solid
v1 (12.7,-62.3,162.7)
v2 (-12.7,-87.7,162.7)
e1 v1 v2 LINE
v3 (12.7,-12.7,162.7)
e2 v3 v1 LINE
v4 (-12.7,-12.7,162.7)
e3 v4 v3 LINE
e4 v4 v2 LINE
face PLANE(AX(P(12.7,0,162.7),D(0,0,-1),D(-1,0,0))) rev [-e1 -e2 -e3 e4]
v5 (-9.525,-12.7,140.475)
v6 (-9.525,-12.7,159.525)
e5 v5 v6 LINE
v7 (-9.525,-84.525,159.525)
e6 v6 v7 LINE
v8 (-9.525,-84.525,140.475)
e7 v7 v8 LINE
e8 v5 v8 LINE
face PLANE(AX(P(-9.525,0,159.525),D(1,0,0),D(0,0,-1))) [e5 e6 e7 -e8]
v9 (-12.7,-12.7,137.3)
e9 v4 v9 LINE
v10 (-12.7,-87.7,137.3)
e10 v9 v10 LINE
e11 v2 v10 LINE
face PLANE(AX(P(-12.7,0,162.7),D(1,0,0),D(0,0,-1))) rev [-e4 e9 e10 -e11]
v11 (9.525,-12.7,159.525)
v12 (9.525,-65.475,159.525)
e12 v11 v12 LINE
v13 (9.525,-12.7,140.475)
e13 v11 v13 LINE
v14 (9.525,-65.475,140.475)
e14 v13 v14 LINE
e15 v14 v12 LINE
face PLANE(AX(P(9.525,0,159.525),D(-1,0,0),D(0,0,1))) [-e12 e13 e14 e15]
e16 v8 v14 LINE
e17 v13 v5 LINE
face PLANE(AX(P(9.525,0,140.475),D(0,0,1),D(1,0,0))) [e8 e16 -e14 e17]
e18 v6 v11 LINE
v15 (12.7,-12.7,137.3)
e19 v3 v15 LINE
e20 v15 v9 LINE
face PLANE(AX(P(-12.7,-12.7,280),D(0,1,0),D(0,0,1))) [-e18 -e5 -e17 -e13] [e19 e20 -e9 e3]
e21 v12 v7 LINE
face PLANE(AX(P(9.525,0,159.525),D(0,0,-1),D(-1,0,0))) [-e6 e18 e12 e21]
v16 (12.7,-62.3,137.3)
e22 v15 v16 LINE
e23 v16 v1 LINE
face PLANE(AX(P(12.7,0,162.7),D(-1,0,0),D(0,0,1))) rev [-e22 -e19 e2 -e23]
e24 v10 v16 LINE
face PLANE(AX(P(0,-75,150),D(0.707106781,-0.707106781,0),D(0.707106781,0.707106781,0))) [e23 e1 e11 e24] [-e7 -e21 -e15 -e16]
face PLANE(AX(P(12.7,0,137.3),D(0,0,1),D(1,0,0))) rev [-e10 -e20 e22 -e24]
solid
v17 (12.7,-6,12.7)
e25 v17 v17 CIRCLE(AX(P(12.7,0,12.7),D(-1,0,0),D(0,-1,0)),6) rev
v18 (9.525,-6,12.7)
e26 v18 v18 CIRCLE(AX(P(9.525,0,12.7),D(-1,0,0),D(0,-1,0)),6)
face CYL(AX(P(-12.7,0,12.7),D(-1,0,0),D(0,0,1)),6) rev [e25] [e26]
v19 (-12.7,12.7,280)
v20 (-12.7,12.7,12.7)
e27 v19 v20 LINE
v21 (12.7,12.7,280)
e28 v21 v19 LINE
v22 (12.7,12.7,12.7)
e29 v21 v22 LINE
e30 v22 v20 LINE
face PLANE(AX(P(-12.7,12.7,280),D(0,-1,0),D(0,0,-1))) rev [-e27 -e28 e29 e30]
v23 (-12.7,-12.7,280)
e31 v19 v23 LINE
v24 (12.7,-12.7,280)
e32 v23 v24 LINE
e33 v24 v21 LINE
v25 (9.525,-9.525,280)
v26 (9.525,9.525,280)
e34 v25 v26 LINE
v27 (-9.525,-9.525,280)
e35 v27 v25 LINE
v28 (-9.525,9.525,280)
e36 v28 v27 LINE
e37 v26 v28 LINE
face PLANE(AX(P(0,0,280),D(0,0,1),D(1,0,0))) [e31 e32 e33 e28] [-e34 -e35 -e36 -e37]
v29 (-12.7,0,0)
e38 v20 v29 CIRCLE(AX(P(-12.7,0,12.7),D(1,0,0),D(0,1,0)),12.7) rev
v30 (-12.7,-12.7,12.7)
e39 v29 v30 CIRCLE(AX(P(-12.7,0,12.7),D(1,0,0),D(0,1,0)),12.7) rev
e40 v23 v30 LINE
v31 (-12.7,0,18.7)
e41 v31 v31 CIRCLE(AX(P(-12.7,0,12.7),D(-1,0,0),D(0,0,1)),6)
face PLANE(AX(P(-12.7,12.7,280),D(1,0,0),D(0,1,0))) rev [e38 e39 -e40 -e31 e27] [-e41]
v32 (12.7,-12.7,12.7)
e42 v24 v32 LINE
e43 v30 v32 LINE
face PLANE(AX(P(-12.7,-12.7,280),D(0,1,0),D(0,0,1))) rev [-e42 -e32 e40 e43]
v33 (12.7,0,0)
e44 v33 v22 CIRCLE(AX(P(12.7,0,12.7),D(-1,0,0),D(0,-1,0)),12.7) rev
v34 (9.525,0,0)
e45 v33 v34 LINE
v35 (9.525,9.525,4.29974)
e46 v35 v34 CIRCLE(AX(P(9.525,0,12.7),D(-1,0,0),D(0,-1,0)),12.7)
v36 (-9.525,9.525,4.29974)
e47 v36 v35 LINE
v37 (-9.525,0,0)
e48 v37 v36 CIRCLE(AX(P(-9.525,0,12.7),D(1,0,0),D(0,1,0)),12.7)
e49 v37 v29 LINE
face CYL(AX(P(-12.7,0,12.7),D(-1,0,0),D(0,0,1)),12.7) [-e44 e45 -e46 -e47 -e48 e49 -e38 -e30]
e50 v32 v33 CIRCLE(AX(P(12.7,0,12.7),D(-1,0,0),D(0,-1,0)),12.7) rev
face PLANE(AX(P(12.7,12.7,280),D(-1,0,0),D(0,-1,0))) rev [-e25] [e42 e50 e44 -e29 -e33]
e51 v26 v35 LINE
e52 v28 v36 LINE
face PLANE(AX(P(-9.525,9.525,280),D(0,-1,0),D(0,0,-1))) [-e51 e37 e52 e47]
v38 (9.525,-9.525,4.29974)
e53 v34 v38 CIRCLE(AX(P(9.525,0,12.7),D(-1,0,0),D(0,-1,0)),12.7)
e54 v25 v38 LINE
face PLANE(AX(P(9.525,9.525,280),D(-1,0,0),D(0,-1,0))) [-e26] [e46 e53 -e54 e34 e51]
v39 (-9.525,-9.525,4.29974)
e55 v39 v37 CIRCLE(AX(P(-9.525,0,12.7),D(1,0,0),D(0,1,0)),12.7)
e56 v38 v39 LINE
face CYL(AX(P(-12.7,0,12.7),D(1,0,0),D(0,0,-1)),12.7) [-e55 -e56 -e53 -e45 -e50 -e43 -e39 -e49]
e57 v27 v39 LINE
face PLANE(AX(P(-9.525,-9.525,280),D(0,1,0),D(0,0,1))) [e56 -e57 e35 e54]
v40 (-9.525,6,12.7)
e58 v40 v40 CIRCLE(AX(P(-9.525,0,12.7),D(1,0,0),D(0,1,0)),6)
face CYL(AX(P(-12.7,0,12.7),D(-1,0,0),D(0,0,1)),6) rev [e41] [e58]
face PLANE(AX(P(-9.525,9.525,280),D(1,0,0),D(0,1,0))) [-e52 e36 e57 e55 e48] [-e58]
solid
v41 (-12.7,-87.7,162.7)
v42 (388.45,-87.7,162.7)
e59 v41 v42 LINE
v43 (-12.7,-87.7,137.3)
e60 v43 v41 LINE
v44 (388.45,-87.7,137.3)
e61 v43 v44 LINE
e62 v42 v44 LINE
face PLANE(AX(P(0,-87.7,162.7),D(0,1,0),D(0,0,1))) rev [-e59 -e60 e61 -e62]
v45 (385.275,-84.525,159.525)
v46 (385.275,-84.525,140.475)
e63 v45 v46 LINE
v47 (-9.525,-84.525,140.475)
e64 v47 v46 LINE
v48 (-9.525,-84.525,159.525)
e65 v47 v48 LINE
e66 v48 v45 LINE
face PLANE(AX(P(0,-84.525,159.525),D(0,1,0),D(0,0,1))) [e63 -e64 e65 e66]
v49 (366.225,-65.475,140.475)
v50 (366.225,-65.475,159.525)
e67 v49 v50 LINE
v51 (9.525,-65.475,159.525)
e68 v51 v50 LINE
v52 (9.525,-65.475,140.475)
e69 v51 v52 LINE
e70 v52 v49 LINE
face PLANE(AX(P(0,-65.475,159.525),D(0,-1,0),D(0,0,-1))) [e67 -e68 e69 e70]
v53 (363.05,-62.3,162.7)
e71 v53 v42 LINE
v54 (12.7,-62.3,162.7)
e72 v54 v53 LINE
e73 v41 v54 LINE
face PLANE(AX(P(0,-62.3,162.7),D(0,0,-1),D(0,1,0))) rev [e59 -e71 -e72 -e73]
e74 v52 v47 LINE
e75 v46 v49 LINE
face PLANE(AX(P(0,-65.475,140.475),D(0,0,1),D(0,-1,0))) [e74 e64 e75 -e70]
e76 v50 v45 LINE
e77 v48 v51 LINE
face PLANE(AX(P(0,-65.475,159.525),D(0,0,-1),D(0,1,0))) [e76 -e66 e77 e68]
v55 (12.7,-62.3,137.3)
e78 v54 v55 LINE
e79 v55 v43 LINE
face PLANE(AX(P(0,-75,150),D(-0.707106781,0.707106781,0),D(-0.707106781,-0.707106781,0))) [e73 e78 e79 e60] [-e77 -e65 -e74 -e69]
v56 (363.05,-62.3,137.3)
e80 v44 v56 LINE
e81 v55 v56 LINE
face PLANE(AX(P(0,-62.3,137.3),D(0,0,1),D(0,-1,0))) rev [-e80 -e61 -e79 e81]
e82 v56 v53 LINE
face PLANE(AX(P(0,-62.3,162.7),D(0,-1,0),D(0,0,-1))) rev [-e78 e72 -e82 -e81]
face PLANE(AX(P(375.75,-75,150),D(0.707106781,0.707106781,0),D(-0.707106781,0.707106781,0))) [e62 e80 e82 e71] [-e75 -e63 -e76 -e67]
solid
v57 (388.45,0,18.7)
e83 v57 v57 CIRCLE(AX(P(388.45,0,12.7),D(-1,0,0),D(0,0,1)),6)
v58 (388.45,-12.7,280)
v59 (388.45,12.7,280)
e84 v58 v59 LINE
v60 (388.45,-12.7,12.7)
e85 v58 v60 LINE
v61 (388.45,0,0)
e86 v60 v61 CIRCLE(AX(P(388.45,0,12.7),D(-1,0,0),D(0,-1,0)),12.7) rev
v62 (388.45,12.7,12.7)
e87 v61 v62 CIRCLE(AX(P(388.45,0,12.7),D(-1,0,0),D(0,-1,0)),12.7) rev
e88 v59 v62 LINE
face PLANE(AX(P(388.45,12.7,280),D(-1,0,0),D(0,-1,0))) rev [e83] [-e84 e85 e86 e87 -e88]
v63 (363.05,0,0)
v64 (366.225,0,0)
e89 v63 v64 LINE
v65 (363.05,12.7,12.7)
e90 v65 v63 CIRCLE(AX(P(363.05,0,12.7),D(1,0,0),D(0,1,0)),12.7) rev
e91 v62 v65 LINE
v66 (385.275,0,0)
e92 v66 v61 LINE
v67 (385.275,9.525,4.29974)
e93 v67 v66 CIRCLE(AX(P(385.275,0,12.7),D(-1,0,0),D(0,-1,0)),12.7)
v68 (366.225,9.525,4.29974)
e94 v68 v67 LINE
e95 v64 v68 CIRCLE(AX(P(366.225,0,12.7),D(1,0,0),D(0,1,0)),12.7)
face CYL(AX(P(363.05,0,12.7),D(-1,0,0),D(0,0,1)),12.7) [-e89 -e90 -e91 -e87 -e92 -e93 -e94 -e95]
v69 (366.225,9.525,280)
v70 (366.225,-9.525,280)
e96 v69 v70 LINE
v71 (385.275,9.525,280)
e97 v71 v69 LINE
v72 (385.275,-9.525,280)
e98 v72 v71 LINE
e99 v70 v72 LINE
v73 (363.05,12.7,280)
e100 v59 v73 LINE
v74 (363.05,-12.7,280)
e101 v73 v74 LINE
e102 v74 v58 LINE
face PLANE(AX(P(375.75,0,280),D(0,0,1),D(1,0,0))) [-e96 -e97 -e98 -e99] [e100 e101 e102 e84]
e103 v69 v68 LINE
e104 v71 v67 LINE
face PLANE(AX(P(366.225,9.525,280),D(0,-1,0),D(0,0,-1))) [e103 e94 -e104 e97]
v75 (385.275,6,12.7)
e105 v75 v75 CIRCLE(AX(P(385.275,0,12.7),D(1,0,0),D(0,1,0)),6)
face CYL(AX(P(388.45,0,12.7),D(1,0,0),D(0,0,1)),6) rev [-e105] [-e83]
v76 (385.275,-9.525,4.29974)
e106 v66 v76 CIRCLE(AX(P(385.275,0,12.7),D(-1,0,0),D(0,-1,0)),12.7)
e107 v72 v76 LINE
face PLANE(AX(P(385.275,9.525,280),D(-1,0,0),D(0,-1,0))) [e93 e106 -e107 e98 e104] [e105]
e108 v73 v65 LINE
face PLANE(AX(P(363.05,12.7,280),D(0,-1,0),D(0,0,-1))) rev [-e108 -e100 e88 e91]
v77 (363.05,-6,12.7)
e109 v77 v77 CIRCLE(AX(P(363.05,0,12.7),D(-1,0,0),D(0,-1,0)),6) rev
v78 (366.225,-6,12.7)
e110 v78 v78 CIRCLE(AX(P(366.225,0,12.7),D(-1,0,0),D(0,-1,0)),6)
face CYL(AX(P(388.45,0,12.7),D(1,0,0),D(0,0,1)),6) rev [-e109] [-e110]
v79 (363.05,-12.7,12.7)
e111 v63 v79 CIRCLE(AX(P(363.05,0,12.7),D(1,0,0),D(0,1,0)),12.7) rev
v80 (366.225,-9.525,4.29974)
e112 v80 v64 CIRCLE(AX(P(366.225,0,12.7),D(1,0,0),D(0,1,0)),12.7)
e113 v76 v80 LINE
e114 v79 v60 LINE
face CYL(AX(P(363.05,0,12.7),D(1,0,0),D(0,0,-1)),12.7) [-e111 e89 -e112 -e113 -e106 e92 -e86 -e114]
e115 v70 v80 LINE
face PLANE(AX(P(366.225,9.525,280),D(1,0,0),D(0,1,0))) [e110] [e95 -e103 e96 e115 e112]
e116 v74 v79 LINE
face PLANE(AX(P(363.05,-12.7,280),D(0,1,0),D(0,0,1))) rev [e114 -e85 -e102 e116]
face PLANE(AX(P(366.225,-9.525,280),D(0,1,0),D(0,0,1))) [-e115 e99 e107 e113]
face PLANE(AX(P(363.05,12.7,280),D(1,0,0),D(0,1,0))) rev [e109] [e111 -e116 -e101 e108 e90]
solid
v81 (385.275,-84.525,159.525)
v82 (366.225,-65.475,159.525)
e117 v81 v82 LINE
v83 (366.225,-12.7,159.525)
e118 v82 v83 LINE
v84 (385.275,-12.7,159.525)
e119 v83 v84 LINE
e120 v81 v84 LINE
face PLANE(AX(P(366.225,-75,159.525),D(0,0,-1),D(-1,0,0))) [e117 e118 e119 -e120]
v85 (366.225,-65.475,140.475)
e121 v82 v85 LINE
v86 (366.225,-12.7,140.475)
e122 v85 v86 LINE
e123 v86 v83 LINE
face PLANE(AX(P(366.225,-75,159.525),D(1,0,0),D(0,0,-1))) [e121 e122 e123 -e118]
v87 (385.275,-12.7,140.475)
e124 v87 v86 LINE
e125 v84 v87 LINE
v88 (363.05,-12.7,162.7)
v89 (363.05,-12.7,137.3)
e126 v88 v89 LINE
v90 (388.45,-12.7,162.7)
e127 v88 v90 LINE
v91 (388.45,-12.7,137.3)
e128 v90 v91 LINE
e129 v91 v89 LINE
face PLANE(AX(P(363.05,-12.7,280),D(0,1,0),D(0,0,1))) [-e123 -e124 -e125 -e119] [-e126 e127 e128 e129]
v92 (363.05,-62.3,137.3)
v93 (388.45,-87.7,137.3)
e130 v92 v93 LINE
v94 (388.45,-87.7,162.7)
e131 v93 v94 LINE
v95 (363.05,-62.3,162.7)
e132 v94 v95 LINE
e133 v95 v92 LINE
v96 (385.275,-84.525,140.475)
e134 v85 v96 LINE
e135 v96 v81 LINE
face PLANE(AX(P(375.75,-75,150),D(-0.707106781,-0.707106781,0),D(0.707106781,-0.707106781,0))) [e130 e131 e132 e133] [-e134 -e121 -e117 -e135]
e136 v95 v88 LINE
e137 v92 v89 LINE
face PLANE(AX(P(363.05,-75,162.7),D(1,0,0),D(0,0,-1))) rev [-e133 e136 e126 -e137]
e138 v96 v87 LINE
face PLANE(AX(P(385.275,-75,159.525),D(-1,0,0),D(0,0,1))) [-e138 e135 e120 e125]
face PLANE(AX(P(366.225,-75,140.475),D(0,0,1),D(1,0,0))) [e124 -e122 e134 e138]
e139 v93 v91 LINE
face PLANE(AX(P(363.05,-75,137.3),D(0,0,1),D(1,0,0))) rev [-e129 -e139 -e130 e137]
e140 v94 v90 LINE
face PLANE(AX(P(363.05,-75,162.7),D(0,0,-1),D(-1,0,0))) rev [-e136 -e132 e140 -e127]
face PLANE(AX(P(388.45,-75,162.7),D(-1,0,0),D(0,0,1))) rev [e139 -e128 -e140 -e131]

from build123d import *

# Parameters (mm, degrees)
SKETCH1_W                   = 25.4
SKETCH1_H                   = 25.4
SKETCH1_W_2                 = 19.05
SKETCH1_H_2                 = 19.05
KICKSTAND_WELDMENTS_DEPTH   = 280
SKETCH1_ON_SEGMENT_2_W      = 25.4
SKETCH1_ON_SEGMENT_2_H      = 25.4
SKETCH1_ON_SEGMENT_2_W_2    = 19.05
SKETCH1_ON_SEGMENT_2_H_2    = 19.05
KICKSTAND_WELDMENTS_2_DEPTH = 280
SKETCH1_ON_SEGMENT_3_W      = 25.4
SKETCH1_ON_SEGMENT_3_H      = 25.4
SKETCH1_ON_SEGMENT_3_W_2    = 19.05
SKETCH1_ON_SEGMENT_3_H_2    = 19.05
KICKSTAND_WELDMENTS_3_DEPTH = 94.960512242
SKETCH1_ON_SEGMENT_4_W      = 25.4
SKETCH1_ON_SEGMENT_4_H      = 25.4
SKETCH1_ON_SEGMENT_4_W_2    = 19.05
SKETCH1_ON_SEGMENT_4_H_2    = 19.05
KICKSTAND_WELDMENTS_4_DEPTH = 413.671024484
SKETCH1_ON_SEGMENT_5_W      = 25.4
SKETCH1_ON_SEGMENT_5_H      = 25.4
SKETCH1_ON_SEGMENT_5_W_2    = 19.05
SKETCH1_ON_SEGMENT_5_H_2    = 19.05
KICKSTAND_WELDMENTS_5_DEPTH = 94.960512242
FILLET1_R                   = 12.7
FILLET2_R                   = 12.7


with BuildPart() as part:
    # Sketch1 → Kickstand Weldments (new body)
    with BuildSketch(Plane.XY):
        Rectangle(SKETCH1_W, SKETCH1_H)
        Rectangle(SKETCH1_W_2, SKETCH1_H_2, mode=Mode.SUBTRACT)
    extrude(amount=KICKSTAND_WELDMENTS_DEPTH)

    # Sketch4 → Ø12.0 (12) Diameter Hole1 (revolve, cut)
    with BuildSketch(Plane(origin=(-12.7, 0, 12.7), x_dir=(0, 0, 1), z_dir=(0, 1, 0))):
        Polygon((0, 0), (0, 29.005163714), (6, 25.4), (6, 0), align=None)
    f_12_0_12_diameter_hole1 = revolve(axis=Axis((-19.05, 0, 12.7), (1, 0, 0)), mode=Mode.SUBTRACT)

    # Fillet1
    # the kernel refuses this fillet: 12.7 mm, written as the material it takes off along each edge
    with BuildSketch(Plane(origin=(-44.45, 12.7, 0), x_dir=(0, 0, 1), z_dir=(1, 0, 0))) as fillet1_piece_1:
        with BuildLine():
            CenterArc((FILLET1_R, FILLET1_R), FILLET1_R, 180, 90)
            Line((0, FILLET1_R), (0, 0))
            Line((0, 0), (FILLET1_R, 0))
        make_face()
    extrude(amount=88.9, mode=Mode.SUBTRACT)
    with BuildSketch(Plane(origin=(44.45, -12.7, 0), x_dir=(0, 1, 0), z_dir=(-1, 0, 0))) as fillet1_piece_2:
        with BuildLine():
            CenterArc((FILLET1_R, -FILLET1_R), FILLET1_R, 90, 90)
            Line((0, -FILLET1_R), (0, 0))
            Line((0, 0), (FILLET1_R, 0))
        make_face()
    extrude(amount=88.9, mode=Mode.SUBTRACT)


with BuildPart() as body_2:
    # Sketch1 on segment 2 (carried to segment 2) → Kickstand Weldments 2 (new body)
    with BuildSketch(Plane(origin=(375.75, 0, 0), x_dir=(1, 0, 0), z_dir=(0, 0, 1))):
        Rectangle(SKETCH1_ON_SEGMENT_2_W, SKETCH1_ON_SEGMENT_2_H)
        Rectangle(SKETCH1_ON_SEGMENT_2_W_2, SKETCH1_ON_SEGMENT_2_H_2, mode=Mode.SUBTRACT)
    extrude(amount=KICKSTAND_WELDMENTS_2_DEPTH)

    # Mirror2: Ø12.0 (12) Diameter Hole1 across plane
    add(f_12_0_12_diameter_hole1.mirror(Plane(origin=(187.875, 0, 0), x_dir=(0, 0, 1), z_dir=(1, 0, 0))), mode=Mode.SUBTRACT)

    # Fillet2
    # the kernel refuses this fillet: 12.7 mm, written as the material it takes off along each edge
    with BuildSketch(Plane(origin=(420.2, -12.7, 0), x_dir=(0, 1, 0), z_dir=(-1, 0, 0))) as fillet2_piece_1:
        with BuildLine():
            CenterArc((FILLET2_R, -FILLET2_R), FILLET2_R, 90, 90)
            Line((0, -FILLET2_R), (0, 0))
            Line((0, 0), (FILLET2_R, 0))
        make_face()
    extrude(amount=88.9, mode=Mode.SUBTRACT)
    with BuildSketch(Plane(origin=(331.3, 12.7, 0), x_dir=(0, 0, 1), z_dir=(1, 0, 0))) as fillet2_piece_2:
        with BuildLine():
            CenterArc((FILLET2_R, FILLET2_R), FILLET2_R, 180, 90)
            Line((0, FILLET2_R), (0, 0))
            Line((0, 0), (FILLET2_R, 0))
        make_face()
    extrude(amount=88.9, mode=Mode.SUBTRACT)


with BuildPart() as body_3:
    # Sketch1 on segment 3 (carried to segment 3) → Kickstand Weldments 3 (new body)
    with BuildSketch(Plane(origin=(375.75, 1, 150), x_dir=(1, 0, 0), z_dir=(0, -1, 0))):
        Rectangle(SKETCH1_ON_SEGMENT_3_W, SKETCH1_ON_SEGMENT_3_H)
        Rectangle(SKETCH1_ON_SEGMENT_3_W_2, SKETCH1_ON_SEGMENT_3_H_2, mode=Mode.SUBTRACT)
    extrude(amount=KICKSTAND_WELDMENTS_3_DEPTH)

    # Kickstand Weldments 3 mitre 1
    split(bisect_by=Plane(origin=(375.75, -75, 150), x_dir=(-0.707106781, 0.707106781, 0), z_dir=(0.707106781, 0.707106781, 0)), keep=Keep.TOP)

    # Kickstand Weldments 3 mitre 2
    split(bisect_by=Plane(origin=(375.75, -12.7, 150), x_dir=(1, 0, 0), z_dir=(0, -1, 0)), keep=Keep.TOP)


with BuildPart() as body_4:
    # Sketch1 on segment 4 (carried to segment 4) → Kickstand Weldments 4 (new body)
    with BuildSketch(Plane(origin=(394.710512242, -75, 150), x_dir=(0, 0, 1), z_dir=(-1, 0, 0))):
        Rectangle(SKETCH1_ON_SEGMENT_4_W, SKETCH1_ON_SEGMENT_4_H)
        Rectangle(SKETCH1_ON_SEGMENT_4_W_2, SKETCH1_ON_SEGMENT_4_H_2, mode=Mode.SUBTRACT)
    extrude(amount=KICKSTAND_WELDMENTS_4_DEPTH)

    # Kickstand Weldments 4 mitre 1
    split(bisect_by=Plane(origin=(375.75, -75, 150), x_dir=(0.707106781, -0.707106781, 0), z_dir=(-0.707106781, -0.707106781, 0)), keep=Keep.TOP)

    # Kickstand Weldments 4 mitre 2
    split(bisect_by=Plane(origin=(0, -75, 150), x_dir=(0.707106781, 0.707106781, 0), z_dir=(0.707106781, -0.707106781, 0)), keep=Keep.TOP)


with BuildPart() as body_5:
    # Sketch1 on segment 5 (carried to segment 5) → Kickstand Weldments 5 (new body)
    with BuildSketch(Plane(origin=(0, 1, 150), x_dir=(1, 0, 0), z_dir=(0, -1, 0))):
        Rectangle(SKETCH1_ON_SEGMENT_5_W, SKETCH1_ON_SEGMENT_5_H)
        Rectangle(SKETCH1_ON_SEGMENT_5_W_2, SKETCH1_ON_SEGMENT_5_H_2, mode=Mode.SUBTRACT)
    extrude(amount=KICKSTAND_WELDMENTS_5_DEPTH)

    # Kickstand Weldments 5 mitre 1
    split(bisect_by=Plane(origin=(0, -75, 150), x_dir=(-0.707106781, -0.707106781, 0), z_dir=(-0.707106781, 0.707106781, 0)), keep=Keep.TOP)

    # Kickstand Weldments 5 mitre 2
    split(bisect_by=Plane(origin=(0, -12.7, 150), x_dir=(1, 0, 0), z_dir=(0, -1, 0)), keep=Keep.TOP)


solid = Compound([part.part, body_2.part, body_3.part, body_4.part, body_5.part])
